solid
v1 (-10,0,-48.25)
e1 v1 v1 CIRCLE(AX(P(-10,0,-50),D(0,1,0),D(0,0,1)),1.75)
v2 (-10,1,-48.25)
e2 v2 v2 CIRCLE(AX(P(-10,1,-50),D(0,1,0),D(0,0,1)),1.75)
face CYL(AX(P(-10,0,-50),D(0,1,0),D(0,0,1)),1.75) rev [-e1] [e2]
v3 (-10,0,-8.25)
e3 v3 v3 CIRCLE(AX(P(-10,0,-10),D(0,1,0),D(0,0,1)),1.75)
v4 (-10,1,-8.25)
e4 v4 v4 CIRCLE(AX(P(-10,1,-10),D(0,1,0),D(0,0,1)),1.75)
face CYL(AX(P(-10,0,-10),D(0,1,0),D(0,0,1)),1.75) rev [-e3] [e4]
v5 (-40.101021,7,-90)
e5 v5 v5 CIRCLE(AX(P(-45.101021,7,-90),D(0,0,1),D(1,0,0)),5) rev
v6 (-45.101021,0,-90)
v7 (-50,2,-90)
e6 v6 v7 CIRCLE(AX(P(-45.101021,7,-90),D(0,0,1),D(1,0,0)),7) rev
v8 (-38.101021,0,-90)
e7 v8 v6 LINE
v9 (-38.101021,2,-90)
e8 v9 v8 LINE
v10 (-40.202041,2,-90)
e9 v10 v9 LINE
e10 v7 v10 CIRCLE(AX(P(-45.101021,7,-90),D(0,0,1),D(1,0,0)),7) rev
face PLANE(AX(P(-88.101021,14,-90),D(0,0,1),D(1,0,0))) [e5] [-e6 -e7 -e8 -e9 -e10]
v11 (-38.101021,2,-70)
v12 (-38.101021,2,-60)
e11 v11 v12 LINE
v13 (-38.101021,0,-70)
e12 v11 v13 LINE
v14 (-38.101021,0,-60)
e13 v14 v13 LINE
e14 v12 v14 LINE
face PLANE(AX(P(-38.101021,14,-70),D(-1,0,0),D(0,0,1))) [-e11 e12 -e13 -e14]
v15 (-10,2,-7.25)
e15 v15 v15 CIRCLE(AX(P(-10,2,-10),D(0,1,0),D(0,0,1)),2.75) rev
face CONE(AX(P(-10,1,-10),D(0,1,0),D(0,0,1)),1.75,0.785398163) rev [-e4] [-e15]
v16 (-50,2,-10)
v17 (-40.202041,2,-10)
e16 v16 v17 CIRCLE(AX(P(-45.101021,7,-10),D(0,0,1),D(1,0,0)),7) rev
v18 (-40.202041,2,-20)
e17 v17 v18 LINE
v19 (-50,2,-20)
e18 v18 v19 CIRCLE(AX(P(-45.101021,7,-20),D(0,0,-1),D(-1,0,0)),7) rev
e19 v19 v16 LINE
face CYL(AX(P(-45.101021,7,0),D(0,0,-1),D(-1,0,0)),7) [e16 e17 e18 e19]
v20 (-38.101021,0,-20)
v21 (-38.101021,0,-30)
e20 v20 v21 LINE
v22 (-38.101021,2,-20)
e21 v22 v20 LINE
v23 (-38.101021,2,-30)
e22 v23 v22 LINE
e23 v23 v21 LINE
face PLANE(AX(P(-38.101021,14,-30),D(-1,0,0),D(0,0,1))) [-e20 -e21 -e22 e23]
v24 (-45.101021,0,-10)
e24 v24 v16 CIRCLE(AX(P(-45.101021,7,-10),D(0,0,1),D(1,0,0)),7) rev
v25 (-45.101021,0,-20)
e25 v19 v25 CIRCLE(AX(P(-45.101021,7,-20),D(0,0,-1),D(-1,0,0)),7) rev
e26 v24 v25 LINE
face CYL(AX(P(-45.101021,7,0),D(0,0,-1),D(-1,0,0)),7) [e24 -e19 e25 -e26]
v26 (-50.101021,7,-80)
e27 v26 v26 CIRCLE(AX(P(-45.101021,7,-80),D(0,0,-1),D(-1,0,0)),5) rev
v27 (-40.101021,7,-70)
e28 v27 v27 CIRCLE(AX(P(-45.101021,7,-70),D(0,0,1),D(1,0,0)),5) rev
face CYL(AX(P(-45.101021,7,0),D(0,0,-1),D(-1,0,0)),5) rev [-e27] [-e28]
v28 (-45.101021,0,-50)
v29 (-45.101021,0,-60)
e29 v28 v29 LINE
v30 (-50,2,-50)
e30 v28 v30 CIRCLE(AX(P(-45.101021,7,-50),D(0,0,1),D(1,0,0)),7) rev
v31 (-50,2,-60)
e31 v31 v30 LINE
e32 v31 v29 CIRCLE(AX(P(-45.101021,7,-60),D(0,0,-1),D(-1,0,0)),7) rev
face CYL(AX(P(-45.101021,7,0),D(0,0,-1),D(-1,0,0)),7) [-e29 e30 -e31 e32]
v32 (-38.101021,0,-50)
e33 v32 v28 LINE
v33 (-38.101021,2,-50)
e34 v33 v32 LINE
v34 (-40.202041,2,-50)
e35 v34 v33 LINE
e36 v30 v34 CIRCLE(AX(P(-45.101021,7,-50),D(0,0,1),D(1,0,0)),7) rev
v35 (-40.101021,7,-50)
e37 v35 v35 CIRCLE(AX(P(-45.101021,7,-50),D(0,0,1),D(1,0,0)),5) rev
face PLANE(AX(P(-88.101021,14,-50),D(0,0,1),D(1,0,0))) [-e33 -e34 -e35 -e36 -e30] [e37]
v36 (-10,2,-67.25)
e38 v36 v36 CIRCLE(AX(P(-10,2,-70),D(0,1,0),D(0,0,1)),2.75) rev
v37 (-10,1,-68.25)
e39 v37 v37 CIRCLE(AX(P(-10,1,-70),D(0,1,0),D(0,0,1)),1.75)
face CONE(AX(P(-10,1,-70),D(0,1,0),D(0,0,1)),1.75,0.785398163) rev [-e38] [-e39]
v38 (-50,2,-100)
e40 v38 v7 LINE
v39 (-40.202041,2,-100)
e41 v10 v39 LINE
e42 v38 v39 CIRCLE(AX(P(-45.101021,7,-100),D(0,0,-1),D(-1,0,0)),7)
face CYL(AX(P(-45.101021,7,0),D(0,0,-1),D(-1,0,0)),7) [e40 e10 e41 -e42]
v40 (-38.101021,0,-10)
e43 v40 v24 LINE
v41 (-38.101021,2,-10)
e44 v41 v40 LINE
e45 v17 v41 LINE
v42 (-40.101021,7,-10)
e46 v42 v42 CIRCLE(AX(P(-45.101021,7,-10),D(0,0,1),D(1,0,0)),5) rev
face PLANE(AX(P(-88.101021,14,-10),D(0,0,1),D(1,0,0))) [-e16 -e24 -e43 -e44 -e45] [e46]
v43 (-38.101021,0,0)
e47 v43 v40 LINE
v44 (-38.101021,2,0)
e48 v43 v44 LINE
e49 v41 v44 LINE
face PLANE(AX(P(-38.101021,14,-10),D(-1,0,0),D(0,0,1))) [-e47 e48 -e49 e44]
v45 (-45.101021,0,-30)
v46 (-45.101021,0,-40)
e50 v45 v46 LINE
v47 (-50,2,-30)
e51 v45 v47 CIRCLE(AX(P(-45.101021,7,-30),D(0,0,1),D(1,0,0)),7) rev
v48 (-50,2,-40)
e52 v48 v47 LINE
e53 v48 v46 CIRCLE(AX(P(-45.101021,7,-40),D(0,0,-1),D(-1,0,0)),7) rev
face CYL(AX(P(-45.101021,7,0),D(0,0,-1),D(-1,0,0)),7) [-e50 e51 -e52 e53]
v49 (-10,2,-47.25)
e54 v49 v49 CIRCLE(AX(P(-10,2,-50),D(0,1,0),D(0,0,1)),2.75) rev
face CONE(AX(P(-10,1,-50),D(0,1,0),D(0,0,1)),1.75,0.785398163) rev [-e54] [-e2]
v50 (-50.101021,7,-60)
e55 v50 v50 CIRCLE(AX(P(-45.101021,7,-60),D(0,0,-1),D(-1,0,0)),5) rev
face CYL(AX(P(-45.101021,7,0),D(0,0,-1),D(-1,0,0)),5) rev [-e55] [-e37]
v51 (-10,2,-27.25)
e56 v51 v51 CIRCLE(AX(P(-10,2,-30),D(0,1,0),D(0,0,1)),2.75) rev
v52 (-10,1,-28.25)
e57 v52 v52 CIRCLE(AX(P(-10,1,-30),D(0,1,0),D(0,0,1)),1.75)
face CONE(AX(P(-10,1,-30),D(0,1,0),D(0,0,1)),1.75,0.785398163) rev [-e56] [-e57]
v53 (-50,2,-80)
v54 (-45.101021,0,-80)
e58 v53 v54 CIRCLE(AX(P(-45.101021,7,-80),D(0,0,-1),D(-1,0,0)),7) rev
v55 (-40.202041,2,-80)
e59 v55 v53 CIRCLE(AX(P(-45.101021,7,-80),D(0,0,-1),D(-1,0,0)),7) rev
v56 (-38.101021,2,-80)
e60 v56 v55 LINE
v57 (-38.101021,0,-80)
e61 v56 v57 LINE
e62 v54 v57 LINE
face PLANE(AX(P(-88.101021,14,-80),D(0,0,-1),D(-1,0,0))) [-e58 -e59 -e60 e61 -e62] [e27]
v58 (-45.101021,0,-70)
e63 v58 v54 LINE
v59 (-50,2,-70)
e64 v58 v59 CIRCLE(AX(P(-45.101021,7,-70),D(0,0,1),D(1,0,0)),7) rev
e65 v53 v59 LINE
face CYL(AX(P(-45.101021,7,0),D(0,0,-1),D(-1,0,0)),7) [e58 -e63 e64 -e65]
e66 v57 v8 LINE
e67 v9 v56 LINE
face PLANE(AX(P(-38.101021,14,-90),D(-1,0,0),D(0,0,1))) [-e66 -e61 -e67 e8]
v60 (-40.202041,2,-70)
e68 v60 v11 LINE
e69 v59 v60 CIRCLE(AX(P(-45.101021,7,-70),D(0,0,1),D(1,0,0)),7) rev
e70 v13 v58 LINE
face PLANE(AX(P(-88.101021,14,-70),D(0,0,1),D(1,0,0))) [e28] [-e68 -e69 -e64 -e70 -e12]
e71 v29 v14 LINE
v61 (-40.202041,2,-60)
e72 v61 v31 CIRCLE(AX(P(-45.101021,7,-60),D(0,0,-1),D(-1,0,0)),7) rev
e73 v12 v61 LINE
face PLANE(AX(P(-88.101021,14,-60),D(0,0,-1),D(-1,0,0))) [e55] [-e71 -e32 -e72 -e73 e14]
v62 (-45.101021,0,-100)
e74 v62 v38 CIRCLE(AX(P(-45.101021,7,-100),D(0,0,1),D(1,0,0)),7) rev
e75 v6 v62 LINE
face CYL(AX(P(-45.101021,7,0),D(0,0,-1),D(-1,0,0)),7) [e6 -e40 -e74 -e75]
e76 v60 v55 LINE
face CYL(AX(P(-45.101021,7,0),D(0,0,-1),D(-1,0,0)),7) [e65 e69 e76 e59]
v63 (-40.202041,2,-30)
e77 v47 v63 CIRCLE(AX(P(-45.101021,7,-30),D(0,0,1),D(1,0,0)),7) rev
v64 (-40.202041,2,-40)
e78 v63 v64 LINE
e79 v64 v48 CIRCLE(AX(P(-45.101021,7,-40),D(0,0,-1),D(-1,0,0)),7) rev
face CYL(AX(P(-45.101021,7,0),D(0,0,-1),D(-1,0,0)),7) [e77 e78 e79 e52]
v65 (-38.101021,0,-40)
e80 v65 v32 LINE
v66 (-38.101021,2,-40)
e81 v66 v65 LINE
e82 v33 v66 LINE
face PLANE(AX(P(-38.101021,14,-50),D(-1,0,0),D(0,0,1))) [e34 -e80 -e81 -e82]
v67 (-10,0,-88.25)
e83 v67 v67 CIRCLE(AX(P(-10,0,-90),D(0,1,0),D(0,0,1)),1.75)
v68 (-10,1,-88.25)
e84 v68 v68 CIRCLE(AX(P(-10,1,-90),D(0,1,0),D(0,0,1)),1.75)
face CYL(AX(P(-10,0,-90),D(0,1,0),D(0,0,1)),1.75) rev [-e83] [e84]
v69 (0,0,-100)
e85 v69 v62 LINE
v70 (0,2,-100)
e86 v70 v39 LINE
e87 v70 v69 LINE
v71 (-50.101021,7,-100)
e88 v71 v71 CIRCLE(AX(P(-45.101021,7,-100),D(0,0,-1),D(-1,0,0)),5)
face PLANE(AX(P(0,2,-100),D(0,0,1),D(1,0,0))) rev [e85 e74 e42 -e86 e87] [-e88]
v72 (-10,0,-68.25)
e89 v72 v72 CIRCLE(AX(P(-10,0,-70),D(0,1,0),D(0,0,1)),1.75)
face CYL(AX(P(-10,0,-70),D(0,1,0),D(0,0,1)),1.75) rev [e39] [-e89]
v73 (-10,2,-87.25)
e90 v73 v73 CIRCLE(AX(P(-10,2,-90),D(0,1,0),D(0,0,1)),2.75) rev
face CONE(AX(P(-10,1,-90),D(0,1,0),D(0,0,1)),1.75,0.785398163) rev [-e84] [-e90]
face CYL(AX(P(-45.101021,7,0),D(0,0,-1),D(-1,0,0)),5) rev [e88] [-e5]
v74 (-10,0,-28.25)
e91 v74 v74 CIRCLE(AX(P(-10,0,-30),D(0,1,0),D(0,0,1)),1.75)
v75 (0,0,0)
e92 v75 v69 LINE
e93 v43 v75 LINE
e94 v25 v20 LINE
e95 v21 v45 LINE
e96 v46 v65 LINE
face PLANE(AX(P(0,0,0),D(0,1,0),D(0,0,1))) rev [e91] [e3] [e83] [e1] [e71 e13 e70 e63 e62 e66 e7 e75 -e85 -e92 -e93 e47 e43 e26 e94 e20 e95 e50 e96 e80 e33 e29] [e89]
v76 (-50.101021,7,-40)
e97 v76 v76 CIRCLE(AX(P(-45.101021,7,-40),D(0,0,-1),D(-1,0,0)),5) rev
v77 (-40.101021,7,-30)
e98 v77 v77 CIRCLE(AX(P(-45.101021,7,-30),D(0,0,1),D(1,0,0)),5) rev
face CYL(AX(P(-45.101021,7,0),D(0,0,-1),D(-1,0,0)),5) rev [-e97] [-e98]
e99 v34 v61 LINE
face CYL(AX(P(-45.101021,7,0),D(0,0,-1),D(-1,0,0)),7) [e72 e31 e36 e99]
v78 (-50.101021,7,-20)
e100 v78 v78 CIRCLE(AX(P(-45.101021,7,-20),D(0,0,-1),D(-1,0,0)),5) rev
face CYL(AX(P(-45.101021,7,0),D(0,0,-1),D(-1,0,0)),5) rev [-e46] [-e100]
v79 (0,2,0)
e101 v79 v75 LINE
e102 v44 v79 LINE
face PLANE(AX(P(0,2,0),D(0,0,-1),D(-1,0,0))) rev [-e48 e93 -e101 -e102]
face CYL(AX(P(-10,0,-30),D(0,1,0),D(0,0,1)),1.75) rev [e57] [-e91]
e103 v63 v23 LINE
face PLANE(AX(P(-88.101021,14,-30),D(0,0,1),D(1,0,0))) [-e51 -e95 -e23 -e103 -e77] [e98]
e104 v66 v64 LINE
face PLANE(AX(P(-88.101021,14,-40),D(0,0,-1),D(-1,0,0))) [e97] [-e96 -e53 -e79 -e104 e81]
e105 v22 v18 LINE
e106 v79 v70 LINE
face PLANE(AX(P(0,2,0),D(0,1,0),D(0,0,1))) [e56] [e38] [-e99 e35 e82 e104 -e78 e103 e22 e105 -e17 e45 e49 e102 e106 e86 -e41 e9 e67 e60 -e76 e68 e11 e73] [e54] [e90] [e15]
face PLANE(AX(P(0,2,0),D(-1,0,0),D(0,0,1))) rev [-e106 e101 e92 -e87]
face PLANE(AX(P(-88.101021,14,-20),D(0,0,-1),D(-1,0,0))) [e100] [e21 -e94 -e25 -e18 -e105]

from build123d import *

# Parameters (mm, degrees)
SKETCH1_W           = 50
SKETCH1_H           = 100
BOSS_EXTRUDE1_DEPTH = 2
SKETCH2_R           = 7
BOSS_EXTRUDE2_DEPTH = 100
SKETCH3_R           = 5
CUT_EXTRUDE1_DEPTH  = 114.624453084
FILLET3_R           = 7
SKETCH6_W           = 50
SKETCH6_H           = 10
CUT_EXTRUDE3_DEPTH  = 114.395398225
LPATTERN1_COUNT     = 5
LPATTERN1_PITCH     = 20
SKETCH7_R           = 1.75
CUT_EXTRUDE4_DEPTH  = 114.395398225
CHAMFER2_SIZE       = 1
LPATTERN3_COUNT     = 5
LPATTERN3_PITCH     = 20
CHAMFER3_SIZE       = 1


with BuildPart() as part:
    # Sketch1 → Boss-Extrude1 (new body)
    with BuildSketch(Plane(origin=(0, 0, 0), x_dir=(1, 0, 0), z_dir=(0, 1, 0))):
        with Locations((-25, 50)):
            Rectangle(SKETCH1_W, SKETCH1_H)
    extrude(amount=BOSS_EXTRUDE1_DEPTH)

    # Sketch2 → Boss-Extrude2 (add)
    with BuildSketch(Plane(origin=(0, 0, -100), x_dir=(-1, 0, 0), z_dir=(0, 0, -1))):
        with Locations((45.101020514, 7)):
            Circle(SKETCH2_R)
    extrude(amount=-BOSS_EXTRUDE2_DEPTH)

    # Sketch3 → Cut-Extrude1 (cut, through all)
    with BuildSketch(Plane(origin=(0, 0, -100), x_dir=(-1, 0, 0), z_dir=(0, 0, -1))):
        with Locations((45.101020514, 7)):
            Circle(SKETCH3_R)
    extrude(amount=-CUT_EXTRUDE1_DEPTH, mode=Mode.SUBTRACT)

    # Fillet3
    # the kernel refuses this fillet: 7 mm, written as the material it takes off along each edge
    with BuildSketch(Plane(origin=(-50, 0, 12.247448714), x_dir=(1, 0, 0), z_dir=(0, 0, -1))) as fillet3_piece_1:
        with BuildLine():
            CenterArc((4.898979486, -7), FILLET3_R, 90, 44.415308597)
            Line((0, -2), (-0.09797959, -1.9))
            ThreePointArc((-0.09797959, -1.9), (-0.14, -1), (-0.14, 0))
            Line((-0.14, 0), (0, 0.14))
            Line((0, 0.14), (4.898979486, 0.14))
            Line((4.898979486, 0.14), (4.898979486, 0))
        make_face()
    extrude(amount=124.494897428, mode=Mode.SUBTRACT)

    # Sketch6 → Cut-Extrude3 (cut, symmetric)
    with BuildSketch(Plane(origin=(0, 2, 0), x_dir=(1, 0, 0), z_dir=(0, 1, 0))):
        with Locations((-63.101020514, 85)):
            Rectangle(SKETCH6_W, SKETCH6_H)
    cut_extrude3 = extrude(amount=CUT_EXTRUDE3_DEPTH, both=True, mode=Mode.SUBTRACT)

    # LPattern1: Cut-Extrude3 ×5
    with Locations(*[(0, 0, i * LPATTERN1_PITCH) for i in range(1, LPATTERN1_COUNT)]):
        add(cut_extrude3, mode=Mode.SUBTRACT)

    # Sketch7 → Cut-Extrude4 (cut, symmetric)
    with BuildSketch(Plane(origin=(0, 2, 0), x_dir=(1, 0, 0), z_dir=(0, 1, 0))):
        with Locations(Location((-10, 90, 0), (0, 0, 270))):
            Circle(SKETCH7_R)
    cut_extrude4 = extrude(amount=CUT_EXTRUDE4_DEPTH, both=True, mode=Mode.SUBTRACT)

    # Chamfer2
    chamfer2_edges = [part.edges().sort_by_distance(p)[0] for p in [
        (-10, 2, -91.75),
    ]]
    chamfer(chamfer2_edges, length=CHAMFER2_SIZE)

    # LPattern3: Cut-Extrude4 ×5
    with Locations(*[(0, 0, i * LPATTERN3_PITCH) for i in range(1, LPATTERN3_COUNT)]):
        add(cut_extrude4, mode=Mode.SUBTRACT)

    # Chamfer3
    chamfer3_edges = [part.edges().sort_by_distance(p)[0] for p in [
        (-10, 2, -71.75),
        (-10, 2, -51.75),
        (-10, 2, -31.75),
        (-10, 2, -11.75),
    ]]
    chamfer(chamfer3_edges, length=CHAMFER3_SIZE)


solid = part.part
